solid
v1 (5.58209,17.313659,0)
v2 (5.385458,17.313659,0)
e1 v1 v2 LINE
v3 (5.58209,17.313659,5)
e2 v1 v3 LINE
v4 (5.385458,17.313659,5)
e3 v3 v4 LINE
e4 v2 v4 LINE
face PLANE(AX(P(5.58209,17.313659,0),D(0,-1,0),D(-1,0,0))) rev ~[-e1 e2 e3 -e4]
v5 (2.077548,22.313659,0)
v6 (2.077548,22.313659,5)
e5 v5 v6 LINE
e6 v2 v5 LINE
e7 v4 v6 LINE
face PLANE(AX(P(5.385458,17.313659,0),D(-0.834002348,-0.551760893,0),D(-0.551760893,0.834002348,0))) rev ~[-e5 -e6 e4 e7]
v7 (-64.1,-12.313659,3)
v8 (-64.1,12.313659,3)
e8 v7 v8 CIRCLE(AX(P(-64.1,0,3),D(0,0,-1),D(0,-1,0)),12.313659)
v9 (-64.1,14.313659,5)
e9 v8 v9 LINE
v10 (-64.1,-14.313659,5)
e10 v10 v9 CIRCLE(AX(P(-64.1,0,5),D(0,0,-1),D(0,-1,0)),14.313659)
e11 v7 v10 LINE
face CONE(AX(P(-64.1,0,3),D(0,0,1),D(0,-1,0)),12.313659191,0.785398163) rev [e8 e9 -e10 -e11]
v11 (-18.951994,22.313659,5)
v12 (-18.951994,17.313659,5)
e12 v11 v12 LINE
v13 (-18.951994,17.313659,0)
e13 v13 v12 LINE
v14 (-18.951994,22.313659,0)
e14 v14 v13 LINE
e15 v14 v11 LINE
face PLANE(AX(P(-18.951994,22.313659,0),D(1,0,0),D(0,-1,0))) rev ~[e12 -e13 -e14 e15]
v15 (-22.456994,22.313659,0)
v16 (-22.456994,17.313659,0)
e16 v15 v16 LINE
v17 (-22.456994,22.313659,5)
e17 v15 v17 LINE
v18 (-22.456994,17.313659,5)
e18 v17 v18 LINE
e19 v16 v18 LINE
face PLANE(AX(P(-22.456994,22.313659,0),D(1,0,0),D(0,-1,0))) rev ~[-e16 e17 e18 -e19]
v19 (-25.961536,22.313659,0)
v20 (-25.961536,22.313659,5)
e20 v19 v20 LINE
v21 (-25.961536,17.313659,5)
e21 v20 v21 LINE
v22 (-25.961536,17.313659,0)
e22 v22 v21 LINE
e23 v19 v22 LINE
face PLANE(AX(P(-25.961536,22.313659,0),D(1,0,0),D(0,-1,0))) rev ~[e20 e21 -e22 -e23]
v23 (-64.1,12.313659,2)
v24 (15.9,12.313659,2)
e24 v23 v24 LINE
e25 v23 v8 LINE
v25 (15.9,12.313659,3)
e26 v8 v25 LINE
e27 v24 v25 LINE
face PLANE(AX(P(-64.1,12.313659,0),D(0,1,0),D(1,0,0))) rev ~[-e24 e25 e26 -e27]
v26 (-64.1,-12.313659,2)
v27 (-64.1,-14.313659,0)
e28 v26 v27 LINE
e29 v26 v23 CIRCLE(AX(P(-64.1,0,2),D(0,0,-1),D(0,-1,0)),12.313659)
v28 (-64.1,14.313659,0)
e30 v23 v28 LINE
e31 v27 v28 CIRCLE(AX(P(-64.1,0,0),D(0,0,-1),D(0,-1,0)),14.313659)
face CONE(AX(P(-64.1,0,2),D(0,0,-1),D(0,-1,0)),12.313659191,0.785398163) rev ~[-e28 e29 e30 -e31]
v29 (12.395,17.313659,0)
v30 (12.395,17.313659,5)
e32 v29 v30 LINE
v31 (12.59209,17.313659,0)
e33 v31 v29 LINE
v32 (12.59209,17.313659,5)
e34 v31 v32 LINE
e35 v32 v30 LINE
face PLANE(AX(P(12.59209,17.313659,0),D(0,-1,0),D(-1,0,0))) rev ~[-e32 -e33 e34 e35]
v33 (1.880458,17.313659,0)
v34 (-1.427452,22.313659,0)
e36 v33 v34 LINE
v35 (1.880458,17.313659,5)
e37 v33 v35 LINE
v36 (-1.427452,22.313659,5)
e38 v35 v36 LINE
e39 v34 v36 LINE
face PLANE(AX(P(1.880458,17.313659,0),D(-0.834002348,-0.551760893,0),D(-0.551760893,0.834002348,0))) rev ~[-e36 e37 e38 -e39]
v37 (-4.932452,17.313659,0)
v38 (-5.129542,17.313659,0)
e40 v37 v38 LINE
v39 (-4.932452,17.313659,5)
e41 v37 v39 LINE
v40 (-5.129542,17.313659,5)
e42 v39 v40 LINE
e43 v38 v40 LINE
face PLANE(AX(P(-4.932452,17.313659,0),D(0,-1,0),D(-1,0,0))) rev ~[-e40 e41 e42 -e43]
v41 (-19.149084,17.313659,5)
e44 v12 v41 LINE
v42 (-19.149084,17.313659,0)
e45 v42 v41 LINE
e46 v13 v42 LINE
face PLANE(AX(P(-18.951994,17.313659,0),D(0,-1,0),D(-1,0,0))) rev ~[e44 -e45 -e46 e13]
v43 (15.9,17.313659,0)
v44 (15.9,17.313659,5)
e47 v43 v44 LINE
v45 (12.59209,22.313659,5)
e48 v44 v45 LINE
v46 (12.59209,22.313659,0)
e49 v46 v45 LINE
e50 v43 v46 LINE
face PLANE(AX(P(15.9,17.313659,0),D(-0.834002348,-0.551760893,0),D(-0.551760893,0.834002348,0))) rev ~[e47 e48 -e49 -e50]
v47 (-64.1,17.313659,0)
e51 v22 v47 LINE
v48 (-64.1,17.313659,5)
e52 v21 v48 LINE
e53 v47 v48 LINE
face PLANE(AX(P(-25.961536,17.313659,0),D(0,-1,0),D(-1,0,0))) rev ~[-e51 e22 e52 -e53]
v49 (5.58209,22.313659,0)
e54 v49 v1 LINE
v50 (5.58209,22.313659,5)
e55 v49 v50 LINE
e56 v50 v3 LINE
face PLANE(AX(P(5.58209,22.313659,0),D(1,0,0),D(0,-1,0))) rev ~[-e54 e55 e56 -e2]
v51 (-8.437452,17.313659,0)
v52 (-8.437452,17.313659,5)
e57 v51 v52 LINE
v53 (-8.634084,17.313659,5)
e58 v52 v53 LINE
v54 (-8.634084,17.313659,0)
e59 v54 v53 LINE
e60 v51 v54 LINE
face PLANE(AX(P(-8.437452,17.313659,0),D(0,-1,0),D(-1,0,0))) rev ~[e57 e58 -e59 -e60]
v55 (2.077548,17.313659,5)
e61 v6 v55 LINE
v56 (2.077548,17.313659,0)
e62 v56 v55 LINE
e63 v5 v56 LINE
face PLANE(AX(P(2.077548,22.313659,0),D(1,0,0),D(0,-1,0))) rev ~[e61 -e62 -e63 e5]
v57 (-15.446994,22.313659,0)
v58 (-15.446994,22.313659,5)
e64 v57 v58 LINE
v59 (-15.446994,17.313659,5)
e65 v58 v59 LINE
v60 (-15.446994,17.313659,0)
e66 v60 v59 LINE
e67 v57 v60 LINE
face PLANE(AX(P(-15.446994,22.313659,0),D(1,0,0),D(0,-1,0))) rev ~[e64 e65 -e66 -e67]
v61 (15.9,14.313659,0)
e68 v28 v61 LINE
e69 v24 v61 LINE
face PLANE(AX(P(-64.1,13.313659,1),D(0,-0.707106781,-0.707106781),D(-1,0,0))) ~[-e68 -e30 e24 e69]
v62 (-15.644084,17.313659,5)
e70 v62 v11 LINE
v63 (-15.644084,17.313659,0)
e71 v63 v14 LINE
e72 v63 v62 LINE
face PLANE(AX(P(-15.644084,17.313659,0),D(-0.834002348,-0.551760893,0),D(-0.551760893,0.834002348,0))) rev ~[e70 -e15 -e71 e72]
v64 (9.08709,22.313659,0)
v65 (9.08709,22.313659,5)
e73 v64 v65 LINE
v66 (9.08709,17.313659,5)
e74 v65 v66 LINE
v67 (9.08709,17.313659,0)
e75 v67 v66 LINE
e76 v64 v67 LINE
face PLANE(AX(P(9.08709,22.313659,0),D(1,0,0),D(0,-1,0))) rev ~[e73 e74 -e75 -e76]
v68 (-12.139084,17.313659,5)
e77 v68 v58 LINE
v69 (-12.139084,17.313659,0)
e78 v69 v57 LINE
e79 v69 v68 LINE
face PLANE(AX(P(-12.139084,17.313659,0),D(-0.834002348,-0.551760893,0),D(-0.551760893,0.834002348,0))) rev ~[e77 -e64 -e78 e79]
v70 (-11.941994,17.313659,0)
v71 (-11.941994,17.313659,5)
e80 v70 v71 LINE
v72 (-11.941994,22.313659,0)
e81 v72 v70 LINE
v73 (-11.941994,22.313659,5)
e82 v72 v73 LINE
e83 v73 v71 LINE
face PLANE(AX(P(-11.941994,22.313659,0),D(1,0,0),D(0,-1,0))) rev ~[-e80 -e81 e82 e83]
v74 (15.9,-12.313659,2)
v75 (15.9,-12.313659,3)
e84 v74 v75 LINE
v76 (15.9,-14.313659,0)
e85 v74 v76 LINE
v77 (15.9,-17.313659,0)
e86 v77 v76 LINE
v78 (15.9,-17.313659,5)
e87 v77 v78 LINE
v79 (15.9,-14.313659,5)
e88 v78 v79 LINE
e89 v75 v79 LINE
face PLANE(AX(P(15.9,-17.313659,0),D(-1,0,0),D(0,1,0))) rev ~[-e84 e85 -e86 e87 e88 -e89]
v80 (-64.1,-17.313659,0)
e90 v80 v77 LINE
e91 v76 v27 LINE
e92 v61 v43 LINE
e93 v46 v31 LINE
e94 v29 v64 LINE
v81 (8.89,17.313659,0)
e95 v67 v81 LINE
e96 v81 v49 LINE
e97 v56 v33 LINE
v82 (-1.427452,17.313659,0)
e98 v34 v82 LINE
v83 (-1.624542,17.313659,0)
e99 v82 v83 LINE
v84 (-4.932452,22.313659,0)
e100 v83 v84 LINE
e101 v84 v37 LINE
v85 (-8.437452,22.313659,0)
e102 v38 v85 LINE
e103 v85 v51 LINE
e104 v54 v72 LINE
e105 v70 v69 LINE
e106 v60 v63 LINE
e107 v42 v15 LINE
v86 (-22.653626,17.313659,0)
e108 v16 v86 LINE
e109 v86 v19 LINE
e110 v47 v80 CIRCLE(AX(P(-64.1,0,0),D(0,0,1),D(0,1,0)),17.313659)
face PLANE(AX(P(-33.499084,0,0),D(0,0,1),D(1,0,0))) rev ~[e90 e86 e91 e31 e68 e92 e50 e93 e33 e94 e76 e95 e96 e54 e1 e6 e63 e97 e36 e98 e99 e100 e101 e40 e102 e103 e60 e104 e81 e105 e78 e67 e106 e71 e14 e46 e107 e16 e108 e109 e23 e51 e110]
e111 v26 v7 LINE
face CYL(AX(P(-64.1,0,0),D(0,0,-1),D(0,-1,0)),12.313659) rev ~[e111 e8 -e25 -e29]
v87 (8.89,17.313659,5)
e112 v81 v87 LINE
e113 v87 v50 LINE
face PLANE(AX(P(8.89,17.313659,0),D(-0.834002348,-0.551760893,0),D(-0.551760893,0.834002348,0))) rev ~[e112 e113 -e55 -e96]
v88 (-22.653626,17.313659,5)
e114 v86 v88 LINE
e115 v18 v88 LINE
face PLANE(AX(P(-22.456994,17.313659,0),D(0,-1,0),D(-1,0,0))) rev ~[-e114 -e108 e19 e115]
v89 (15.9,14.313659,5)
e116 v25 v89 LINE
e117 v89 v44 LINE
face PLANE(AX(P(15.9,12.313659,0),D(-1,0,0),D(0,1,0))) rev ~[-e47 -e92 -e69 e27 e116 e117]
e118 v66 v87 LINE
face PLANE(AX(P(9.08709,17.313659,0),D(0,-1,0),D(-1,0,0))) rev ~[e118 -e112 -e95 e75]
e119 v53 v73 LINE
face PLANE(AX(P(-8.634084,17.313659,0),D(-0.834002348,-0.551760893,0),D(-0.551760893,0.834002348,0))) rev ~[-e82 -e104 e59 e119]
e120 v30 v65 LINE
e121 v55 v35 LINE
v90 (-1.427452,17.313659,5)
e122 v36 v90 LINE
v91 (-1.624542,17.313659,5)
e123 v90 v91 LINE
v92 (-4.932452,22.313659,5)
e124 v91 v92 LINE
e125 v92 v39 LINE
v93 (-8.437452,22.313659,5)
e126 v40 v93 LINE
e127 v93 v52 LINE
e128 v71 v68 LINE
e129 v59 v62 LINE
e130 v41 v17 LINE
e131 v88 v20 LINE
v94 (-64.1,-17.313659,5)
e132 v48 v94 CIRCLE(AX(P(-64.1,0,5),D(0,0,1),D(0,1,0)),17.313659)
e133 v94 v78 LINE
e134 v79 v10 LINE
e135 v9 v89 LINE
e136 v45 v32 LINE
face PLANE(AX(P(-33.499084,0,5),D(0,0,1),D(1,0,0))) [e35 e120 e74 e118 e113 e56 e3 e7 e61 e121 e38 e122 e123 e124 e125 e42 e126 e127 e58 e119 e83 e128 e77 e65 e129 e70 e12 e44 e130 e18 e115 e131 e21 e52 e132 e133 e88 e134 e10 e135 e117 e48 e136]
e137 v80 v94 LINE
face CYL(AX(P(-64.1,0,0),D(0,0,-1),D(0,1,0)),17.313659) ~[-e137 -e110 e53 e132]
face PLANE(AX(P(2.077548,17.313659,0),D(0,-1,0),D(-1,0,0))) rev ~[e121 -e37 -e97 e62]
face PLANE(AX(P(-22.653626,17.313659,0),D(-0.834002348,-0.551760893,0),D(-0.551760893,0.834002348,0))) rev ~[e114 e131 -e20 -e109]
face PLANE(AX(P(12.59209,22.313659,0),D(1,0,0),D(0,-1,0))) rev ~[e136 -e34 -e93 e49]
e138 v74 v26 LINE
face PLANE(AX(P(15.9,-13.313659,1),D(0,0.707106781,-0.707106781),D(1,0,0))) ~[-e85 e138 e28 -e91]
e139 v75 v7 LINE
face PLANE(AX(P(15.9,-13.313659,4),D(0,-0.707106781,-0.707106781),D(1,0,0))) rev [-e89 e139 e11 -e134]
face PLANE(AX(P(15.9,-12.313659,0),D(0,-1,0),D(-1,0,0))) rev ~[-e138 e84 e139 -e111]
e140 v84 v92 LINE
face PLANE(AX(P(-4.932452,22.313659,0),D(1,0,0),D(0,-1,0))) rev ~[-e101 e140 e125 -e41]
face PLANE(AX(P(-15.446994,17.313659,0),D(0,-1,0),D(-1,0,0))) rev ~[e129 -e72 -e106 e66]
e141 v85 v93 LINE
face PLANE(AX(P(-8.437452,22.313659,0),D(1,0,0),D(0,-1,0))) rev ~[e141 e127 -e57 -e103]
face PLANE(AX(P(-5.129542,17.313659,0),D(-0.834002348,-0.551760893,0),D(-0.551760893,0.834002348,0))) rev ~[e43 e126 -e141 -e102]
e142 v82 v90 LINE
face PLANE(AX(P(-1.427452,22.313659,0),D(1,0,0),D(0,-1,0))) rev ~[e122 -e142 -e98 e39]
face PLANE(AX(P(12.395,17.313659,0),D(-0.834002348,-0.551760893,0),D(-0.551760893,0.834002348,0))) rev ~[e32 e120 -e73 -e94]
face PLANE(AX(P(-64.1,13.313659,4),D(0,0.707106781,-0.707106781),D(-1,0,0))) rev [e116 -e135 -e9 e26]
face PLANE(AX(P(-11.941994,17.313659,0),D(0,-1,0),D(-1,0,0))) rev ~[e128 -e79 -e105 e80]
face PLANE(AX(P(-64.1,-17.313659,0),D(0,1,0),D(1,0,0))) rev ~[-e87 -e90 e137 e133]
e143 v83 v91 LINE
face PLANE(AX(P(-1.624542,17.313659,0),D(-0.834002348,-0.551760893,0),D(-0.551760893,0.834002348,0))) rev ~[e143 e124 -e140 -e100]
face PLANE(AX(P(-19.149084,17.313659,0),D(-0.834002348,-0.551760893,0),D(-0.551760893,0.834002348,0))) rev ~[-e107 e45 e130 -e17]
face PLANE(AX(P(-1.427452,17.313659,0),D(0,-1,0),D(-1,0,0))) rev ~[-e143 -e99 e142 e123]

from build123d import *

# Parameters (mm, degrees)
F1_DEPTH = 5
F2_SIZE  = 2


# Not quite as in the source:
# - a feature names something its author has since deleted; it is built from what else it names


with BuildPart() as f1:
    # F0 (on Top) → F1 (new body)
    with BuildSketch(Plane.XY):
        with BuildLine():
            ThreePointArc((-64.1, -12.3136591911), (-76.4136591911, 0), (-64.1, 12.3136591911))
            Line((-64.1, 12.3136591911), (0, 12.3136591911))
            Line((0, 12.3136591911), (15.9, 12.3136591911))
            Line((15.9, 12.3136591911), (15.9, 17.3136591911))
            Line((15.9, 17.3136591911), (12.5920902938, 17.3136591911))
            Line((12.5920902938, 17.3136591911), (12.395, 17.3136591911))
            Line((12.395, 17.3136591911), (9.0870902938, 17.3136591911))
            Line((9.0870902938, 17.3136591911), (8.89, 17.3136591911))
            Line((8.89, 17.3136591911), (5.5820902938, 17.3136591911))
            Line((5.5820902938, 17.3136591911), (5.3854580642, 17.3136591911))
            Line((5.3854580642, 17.3136591911), (2.077548358, 17.3136591911))
            Line((2.077548358, 17.3136591911), (1.8804580642, 17.3136591911))
            Line((1.8804580642, 17.3136591911), (0, 17.3136591911))
            Line((0, 17.3136591911), (-1.427451642, 17.3136591911))
            Line((-1.427451642, 17.3136591911), (-1.6245419358, 17.3136591911))
            Line((-1.6245419358, 17.3136591911), (-4.932451642, 17.3136591911))
            Line((-4.932451642, 17.3136591911), (-5.1295419358, 17.3136591911))
            Line((-5.1295419358, 17.3136591911), (-8.437451642, 17.3136591911))
            Line((-8.437451642, 17.3136591911), (-8.6340838715, 17.3136591911))
            Line((-8.6340838715, 17.3136591911), (-11.9419935778, 17.3136591911))
            Line((-11.9419935778, 17.3136591911), (-12.1390838715, 17.3136591911))
            Line((-12.1390838715, 17.3136591911), (-15.4469935778, 17.3136591911))
            Line((-15.4469935778, 17.3136591911), (-15.6440838715, 17.3136591911))
            Line((-15.6440838715, 17.3136591911), (-18.9519935778, 17.3136591911))
            Line((-18.9519935778, 17.3136591911), (-19.1490838715, 17.3136591911))
            Line((-19.1490838715, 17.3136591911), (-22.4569935778, 17.3136591911))
            Line((-22.4569935778, 17.3136591911), (-22.6536258073, 17.3136591911))
            Line((-22.6536258073, 17.3136591911), (-25.9615355136, 17.3136591911))
            Line((-25.9615355136, 17.3136591911), (-64.1, 17.3136591911))
            ThreePointArc((-64.1, 17.3136591911), (-81.4136591911, 0), (-64.1, -17.3136591911))
            Line((-64.1, -17.3136591911), (0, -17.3136591911))
            Line((0, -17.3136591911), (15.9, -17.3136591911))
            Line((15.9, -17.3136591911), (15.9, -12.3136591911))
            Line((15.9, -12.3136591911), (0, -12.3136591911))
            Line((0, -12.3136591911), (-64.1, -12.3136591911))
        make_face()
        Polygon((12.5920902938, 17.3136591911), (15.9, 17.3136591911), (12.5920902938, 22.3136591911), align=None)
        Polygon((9.0870902938, 17.3136591911), (12.395, 17.3136591911), (9.0870902938, 22.3136591911), align=None)
        Polygon((5.5820902938, 17.3136591911), (8.89, 17.3136591911), (5.5820902938, 22.3136591911), align=None)
        Polygon((2.077548358, 17.3136591911), (5.3854580642, 17.3136591911), (2.077548358, 22.3136591911), align=None)
        Polygon((0, 17.3136591911), (1.8804580642, 17.3136591911), (-1.427451642, 22.3136591911), (-1.427451642, 17.3136591911), align=None)
        Polygon((-4.932451642, 17.3136591911), (-1.6245419358, 17.3136591911), (-4.932451642, 22.3136591911), align=None)
        Polygon((-8.437451642, 17.3136591911), (-5.1295419358, 17.3136591911), (-8.437451642, 22.3136591911), align=None)
        Polygon((-11.9419935778, 22.3136591911), (-11.9419935778, 17.3136591911), (-8.6340838715, 17.3136591911), align=None)
        Polygon((-15.4469935778, 22.3136591911), (-15.4469935778, 17.3136591911), (-12.1390838715, 17.3136591911), align=None)
        Polygon((-18.9519935778, 22.3136591911), (-18.9519935778, 17.3136591911), (-15.6440838715, 17.3136591911), align=None)
        Polygon((-22.4569935778, 22.3136591911), (-22.4569935778, 17.3136591911), (-19.1490838715, 17.3136591911), align=None)
        Polygon((-25.9615355136, 22.3136591911), (-25.9615355136, 17.3136591911), (-22.6536258073, 17.3136591911), align=None)
    extrude(amount=F1_DEPTH)

    # F2
    f2_edges = [f1.edges().sort_by_distance(p)[0] for p in [
        (-76.413659, 0, 5),
        (-76.413659, 0, 0),
    ]]
    chamfer(f2_edges, length=F2_SIZE)


solid = f1.part
